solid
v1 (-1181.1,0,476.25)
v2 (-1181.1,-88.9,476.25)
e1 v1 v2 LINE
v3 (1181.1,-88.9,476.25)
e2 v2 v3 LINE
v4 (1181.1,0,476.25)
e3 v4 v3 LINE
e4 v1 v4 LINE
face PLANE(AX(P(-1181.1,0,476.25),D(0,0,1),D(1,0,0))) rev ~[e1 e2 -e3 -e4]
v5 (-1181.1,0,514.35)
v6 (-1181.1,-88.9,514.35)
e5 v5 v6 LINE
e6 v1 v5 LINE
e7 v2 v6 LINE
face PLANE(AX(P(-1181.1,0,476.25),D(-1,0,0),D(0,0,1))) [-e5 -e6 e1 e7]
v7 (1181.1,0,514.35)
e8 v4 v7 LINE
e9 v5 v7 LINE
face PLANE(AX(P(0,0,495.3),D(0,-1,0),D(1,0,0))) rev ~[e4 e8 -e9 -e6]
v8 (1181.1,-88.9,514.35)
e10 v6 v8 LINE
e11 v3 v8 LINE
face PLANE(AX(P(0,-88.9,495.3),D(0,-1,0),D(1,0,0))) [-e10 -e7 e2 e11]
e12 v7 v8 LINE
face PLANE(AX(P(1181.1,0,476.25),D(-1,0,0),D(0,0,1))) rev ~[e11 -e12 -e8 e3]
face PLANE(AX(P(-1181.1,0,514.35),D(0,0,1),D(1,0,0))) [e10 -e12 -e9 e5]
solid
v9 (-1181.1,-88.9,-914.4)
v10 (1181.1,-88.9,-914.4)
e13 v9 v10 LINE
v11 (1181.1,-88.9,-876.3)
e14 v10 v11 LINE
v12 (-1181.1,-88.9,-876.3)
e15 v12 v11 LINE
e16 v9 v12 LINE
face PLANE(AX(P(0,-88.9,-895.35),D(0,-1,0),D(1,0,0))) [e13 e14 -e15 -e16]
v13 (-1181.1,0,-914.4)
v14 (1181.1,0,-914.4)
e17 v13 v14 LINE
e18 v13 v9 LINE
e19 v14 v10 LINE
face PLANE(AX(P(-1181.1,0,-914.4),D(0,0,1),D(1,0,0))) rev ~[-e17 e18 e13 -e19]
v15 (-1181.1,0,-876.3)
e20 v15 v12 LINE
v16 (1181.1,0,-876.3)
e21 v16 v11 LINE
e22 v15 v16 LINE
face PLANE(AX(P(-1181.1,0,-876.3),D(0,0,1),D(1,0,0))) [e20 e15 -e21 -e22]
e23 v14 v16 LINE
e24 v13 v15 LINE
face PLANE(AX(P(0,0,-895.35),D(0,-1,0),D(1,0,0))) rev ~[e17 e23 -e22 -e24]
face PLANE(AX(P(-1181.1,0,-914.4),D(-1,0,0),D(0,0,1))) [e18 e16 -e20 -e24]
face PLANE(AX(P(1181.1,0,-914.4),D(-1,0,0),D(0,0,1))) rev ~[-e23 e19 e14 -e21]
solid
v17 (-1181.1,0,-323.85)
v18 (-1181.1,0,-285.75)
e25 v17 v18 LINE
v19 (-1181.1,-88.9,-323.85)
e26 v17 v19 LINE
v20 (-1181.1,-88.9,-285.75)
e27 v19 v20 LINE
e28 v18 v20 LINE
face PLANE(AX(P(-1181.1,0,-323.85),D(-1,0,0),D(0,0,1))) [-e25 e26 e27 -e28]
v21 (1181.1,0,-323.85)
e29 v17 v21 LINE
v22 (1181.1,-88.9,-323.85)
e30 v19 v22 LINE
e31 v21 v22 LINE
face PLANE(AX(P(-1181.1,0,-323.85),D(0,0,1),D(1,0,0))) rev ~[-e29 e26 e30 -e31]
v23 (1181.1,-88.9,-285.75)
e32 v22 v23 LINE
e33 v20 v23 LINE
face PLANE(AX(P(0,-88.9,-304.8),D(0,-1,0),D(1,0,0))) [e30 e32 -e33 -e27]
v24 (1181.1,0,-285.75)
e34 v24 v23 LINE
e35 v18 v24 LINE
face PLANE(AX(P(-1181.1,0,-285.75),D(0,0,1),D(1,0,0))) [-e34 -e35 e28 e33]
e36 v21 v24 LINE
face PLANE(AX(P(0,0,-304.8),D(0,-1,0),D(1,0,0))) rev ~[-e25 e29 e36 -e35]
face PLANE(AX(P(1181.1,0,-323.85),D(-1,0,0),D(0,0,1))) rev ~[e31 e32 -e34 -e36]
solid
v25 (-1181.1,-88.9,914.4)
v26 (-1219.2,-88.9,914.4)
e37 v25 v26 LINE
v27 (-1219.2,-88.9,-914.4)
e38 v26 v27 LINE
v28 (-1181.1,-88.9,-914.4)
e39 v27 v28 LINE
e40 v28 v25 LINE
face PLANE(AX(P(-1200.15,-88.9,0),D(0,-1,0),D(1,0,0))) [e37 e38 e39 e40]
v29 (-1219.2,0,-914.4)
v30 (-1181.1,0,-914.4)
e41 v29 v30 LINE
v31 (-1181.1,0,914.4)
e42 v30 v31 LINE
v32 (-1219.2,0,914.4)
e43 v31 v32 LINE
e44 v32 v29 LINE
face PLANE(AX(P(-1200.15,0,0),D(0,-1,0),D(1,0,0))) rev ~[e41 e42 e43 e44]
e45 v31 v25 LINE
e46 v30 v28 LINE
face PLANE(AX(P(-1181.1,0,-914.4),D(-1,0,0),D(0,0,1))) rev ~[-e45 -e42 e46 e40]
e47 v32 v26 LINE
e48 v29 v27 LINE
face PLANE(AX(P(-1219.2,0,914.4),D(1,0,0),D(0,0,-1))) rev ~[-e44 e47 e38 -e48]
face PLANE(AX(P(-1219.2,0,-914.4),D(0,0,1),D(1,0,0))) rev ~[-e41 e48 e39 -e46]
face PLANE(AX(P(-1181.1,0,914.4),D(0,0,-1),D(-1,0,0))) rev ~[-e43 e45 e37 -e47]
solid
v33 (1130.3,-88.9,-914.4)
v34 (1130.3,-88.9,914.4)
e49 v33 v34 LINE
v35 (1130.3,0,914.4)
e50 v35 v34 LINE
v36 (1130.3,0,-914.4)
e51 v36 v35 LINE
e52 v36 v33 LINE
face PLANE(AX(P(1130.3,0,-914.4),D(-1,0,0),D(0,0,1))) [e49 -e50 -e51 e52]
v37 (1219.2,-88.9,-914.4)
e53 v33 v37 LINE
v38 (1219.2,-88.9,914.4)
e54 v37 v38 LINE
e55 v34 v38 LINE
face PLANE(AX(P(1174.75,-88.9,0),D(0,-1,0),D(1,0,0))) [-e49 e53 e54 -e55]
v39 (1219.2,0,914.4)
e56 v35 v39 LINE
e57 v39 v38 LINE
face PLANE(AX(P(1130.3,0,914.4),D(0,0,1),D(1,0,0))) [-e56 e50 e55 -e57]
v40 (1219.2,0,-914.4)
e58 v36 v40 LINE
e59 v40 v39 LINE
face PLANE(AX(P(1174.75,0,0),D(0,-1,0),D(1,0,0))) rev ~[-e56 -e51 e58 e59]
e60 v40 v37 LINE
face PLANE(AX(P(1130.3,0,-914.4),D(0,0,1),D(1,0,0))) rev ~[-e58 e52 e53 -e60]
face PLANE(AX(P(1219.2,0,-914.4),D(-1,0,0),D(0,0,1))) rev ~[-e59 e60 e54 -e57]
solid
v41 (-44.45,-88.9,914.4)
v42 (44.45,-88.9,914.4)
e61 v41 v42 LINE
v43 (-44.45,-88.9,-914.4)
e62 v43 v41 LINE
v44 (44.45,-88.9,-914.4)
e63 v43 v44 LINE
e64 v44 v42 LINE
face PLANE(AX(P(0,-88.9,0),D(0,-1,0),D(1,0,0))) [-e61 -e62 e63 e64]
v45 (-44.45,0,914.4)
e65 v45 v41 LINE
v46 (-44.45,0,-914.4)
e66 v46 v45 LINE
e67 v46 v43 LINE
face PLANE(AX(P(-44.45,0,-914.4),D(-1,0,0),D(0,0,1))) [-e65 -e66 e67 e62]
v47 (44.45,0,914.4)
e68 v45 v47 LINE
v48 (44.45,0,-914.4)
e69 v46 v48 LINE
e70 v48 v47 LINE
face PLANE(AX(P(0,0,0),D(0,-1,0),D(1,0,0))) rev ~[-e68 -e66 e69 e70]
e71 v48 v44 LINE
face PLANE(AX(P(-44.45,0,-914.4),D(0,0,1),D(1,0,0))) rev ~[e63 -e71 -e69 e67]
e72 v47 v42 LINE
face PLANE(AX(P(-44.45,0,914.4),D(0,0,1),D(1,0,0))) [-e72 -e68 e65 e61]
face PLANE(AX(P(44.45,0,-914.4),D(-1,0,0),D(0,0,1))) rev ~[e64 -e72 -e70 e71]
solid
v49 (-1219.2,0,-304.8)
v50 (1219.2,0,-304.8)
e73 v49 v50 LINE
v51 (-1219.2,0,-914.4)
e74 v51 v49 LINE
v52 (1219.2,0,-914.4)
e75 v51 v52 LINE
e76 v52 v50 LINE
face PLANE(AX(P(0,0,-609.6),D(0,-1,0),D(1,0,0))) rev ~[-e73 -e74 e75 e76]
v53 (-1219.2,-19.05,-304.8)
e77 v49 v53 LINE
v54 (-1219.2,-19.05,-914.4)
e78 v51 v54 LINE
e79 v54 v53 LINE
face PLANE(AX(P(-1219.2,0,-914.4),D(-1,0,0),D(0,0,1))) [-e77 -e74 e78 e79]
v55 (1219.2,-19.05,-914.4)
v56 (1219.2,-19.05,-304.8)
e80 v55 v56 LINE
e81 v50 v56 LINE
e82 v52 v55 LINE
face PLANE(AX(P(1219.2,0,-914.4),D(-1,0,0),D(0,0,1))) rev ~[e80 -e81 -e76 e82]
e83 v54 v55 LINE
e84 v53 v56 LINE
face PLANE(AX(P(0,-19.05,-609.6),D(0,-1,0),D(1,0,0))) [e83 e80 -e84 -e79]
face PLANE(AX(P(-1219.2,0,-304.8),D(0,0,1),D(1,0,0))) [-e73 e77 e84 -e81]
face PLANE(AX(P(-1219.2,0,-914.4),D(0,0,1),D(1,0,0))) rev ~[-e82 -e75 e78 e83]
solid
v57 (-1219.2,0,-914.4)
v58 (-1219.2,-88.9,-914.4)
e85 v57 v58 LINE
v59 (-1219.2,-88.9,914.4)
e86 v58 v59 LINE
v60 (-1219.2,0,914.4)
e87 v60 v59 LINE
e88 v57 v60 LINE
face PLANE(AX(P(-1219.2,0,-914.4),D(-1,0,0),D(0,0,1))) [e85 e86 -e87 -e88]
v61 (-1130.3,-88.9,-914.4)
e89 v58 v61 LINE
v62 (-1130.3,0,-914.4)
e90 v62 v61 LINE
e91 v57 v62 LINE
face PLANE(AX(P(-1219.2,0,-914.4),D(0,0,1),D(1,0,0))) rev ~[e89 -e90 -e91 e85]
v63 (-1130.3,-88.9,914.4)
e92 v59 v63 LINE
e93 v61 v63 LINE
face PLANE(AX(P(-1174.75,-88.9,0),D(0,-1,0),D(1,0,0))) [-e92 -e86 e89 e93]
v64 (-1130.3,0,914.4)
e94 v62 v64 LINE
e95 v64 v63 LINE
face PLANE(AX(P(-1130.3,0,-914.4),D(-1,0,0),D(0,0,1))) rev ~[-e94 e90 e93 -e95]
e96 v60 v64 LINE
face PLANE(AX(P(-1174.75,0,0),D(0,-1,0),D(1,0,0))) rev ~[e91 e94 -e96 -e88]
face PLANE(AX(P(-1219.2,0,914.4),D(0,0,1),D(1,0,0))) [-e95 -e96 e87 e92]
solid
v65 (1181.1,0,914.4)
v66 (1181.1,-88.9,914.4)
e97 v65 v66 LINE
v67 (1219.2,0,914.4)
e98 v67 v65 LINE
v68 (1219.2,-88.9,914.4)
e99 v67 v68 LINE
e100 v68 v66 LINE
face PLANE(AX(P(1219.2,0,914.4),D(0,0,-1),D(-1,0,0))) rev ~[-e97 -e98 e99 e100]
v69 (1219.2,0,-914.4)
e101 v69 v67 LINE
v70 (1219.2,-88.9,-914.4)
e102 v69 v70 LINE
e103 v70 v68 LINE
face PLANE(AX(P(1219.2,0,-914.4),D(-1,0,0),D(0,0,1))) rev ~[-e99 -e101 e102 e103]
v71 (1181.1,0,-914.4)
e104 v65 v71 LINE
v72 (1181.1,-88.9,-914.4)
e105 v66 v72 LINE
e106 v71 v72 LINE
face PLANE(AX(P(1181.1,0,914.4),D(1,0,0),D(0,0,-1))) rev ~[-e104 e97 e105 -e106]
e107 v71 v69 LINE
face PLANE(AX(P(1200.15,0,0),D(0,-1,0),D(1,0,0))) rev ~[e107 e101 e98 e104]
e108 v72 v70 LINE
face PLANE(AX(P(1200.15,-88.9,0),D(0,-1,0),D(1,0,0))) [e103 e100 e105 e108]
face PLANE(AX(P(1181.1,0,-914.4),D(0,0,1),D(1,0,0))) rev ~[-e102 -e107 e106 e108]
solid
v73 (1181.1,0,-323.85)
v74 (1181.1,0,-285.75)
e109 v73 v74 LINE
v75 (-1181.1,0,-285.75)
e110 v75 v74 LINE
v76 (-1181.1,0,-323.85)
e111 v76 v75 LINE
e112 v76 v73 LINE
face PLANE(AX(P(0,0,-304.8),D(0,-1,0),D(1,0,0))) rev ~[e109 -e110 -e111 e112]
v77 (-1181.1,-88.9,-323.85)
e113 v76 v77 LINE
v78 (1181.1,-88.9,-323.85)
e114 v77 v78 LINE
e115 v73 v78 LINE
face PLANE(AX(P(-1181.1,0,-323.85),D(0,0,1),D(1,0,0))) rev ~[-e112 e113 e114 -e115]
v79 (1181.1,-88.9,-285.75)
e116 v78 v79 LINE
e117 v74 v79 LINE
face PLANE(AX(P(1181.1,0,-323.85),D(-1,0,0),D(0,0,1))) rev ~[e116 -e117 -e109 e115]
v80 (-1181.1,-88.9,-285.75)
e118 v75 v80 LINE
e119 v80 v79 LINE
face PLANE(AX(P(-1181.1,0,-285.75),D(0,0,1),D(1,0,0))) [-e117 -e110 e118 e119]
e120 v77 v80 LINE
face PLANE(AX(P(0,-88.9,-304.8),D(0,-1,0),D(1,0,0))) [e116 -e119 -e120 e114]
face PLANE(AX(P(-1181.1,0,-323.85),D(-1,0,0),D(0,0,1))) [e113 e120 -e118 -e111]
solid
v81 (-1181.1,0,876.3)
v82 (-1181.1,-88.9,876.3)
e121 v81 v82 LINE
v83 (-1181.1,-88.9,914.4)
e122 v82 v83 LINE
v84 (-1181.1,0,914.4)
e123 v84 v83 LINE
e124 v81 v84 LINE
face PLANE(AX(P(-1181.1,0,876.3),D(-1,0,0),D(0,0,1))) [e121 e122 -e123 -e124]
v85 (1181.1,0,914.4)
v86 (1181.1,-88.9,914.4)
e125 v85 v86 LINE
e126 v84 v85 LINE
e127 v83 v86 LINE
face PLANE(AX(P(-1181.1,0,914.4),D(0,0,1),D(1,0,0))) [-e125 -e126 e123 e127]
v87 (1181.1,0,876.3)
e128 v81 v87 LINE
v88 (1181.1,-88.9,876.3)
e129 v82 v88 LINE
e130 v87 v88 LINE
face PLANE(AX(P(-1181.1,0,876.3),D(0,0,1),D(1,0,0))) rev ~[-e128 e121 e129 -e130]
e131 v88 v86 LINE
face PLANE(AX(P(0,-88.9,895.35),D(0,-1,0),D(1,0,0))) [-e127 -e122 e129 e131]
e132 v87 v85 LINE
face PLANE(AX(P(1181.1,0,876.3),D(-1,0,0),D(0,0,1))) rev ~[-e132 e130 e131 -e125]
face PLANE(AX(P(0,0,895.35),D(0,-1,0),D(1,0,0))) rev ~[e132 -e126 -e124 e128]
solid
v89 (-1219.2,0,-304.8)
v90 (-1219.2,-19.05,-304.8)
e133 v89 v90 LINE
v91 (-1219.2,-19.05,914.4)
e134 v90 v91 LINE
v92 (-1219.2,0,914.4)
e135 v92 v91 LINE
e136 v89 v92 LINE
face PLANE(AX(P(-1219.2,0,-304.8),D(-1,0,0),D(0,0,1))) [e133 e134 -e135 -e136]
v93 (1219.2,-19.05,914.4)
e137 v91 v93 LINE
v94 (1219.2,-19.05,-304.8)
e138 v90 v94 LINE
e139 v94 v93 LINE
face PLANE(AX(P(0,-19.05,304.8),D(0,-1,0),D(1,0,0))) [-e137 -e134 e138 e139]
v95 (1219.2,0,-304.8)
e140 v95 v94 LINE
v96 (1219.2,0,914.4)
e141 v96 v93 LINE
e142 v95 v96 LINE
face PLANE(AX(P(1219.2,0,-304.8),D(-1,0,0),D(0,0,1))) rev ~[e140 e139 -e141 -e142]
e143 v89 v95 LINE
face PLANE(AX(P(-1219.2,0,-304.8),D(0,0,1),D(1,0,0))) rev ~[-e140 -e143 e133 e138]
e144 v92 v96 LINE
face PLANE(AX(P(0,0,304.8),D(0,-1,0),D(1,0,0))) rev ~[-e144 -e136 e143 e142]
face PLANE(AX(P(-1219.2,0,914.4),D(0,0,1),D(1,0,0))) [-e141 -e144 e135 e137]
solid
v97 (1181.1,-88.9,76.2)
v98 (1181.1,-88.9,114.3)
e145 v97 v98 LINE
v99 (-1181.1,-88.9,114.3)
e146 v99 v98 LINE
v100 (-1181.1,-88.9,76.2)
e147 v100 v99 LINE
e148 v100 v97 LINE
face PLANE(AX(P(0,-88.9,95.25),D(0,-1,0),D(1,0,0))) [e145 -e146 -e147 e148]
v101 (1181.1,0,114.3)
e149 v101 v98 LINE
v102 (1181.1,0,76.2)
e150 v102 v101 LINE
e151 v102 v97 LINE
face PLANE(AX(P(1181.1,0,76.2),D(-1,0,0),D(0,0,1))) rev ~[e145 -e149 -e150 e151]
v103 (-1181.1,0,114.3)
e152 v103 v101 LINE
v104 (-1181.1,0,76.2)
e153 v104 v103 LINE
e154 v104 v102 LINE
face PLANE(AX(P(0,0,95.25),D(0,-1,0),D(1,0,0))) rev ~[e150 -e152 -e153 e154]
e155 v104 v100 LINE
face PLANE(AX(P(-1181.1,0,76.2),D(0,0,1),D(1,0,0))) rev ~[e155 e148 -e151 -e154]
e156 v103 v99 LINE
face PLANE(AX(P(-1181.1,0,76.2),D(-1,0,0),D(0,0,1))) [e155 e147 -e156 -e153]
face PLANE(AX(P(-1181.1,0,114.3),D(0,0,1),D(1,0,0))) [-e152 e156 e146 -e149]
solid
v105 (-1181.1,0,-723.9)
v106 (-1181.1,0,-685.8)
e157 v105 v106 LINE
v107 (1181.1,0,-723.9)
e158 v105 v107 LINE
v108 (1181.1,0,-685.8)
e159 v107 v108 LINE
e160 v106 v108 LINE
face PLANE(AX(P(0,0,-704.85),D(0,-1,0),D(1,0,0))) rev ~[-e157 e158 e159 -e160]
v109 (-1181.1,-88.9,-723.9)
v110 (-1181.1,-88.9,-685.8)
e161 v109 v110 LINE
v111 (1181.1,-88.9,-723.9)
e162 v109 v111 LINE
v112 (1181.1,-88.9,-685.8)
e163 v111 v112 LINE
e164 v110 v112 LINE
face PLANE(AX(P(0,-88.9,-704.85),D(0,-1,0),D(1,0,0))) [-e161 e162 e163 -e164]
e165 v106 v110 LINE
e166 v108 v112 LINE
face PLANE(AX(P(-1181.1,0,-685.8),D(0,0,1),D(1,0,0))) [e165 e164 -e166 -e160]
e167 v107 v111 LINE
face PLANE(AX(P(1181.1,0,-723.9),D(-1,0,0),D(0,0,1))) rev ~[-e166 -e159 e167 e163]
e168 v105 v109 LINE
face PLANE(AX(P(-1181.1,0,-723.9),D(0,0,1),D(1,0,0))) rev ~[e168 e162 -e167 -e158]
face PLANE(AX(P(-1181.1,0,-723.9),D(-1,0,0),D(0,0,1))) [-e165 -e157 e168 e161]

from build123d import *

# Parameters (mm, degrees)
F1_W      = 88.9
F1_H      = 1828.8
F3_DEPTH  = 88.9
F2_W      = 2362.2
F2_H      = 38.1
F4_DEPTH  = 88.9
F5_DEPTH  = 88.9
F6_DEPTH  = 88.9
F8_DEPTH  = 88.9
F7_W      = 2438.4
F7_H      = 1219.2
F7_W_2    = 2362.2
F7_H_2    = 361.95
F9_DEPTH  = 19.05
F7_H_3    = 609.6
F10_DEPTH = 19.05


# Not quite as in the source:
# - a feature names something its author has since deleted; it is built from what else it names


with BuildPart() as f3:
    # F1 (on face) → F3 (new body)
    with BuildSketch(Plane.XZ):
        with Locations((-1174.75, 0)):
            Rectangle(F1_W, F1_H)
    extrude(amount=F3_DEPTH)


with BuildPart() as f3b:
    # F1 (on face) → F3, piece 2 (new body)
    with BuildSketch(Plane.XZ):
        Rectangle(F1_W, F1_H)
    extrude(amount=F3_DEPTH)


with BuildPart() as f3c:
    # F1 (on face) → F3, piece 3 (new body)
    with BuildSketch(Plane.XZ):
        with Locations((1174.75, 0)):
            Rectangle(F1_W, F1_H)
    extrude(amount=F3_DEPTH)


with BuildPart() as f4:
    # F2 (on face) → F4 (new body)
    with BuildSketch(Plane.XZ):
        with Locations((0, 895.35)):
            Rectangle(F2_W, F2_H)
    extrude(amount=F4_DEPTH)


with BuildPart() as f4b:
    # F2 (on face) → F4, piece 2 (new body)
    with BuildSketch(Plane.XZ):
        with Locations((0, -895.35)):
            Rectangle(F2_W, F2_H)
    extrude(amount=F4_DEPTH)


with BuildPart() as f5:
    # F2 (on face) → F5 (new body)
    with BuildSketch(Plane.XZ):
        Polygon((-1181.1, 876.3), (-1181.1, 914.4), (-1219.2, 914.4), (-1219.2, -914.4), (-1181.1, -914.4), (-1181.1, -876.3), (-1181.1, -723.9), (-1181.1, -685.8), (-1181.1, -323.85), (-1181.1, -285.75), (-1181.1, 76.2), (-1181.1, 114.3), (-1181.1, 476.25), (-1181.1, 514.35), align=None)
    extrude(amount=F5_DEPTH)


with BuildPart() as f5b:
    # F2 (on face) → F5, piece 2 (new body)
    with BuildSketch(Plane.XZ):
        Polygon((1219.2, 914.4), (1181.1, 914.4), (1181.1, 876.3), (1181.1, 514.35), (1181.1, 476.25), (1181.1, 114.3), (1181.1, 76.2), (1181.1, -285.75), (1181.1, -323.85), (1181.1, -685.8), (1181.1, -723.9), (1181.1, -876.3), (1181.1, -914.4), (1219.2, -914.4), align=None)
    extrude(amount=F5_DEPTH)


with BuildPart() as f6:
    # F2 (on face) → F6 (new body)
    with BuildSketch(Plane.XZ):
        with Locations((0, 495.3)):
            Rectangle(F2_W, F2_H)
    extrude(amount=F6_DEPTH)


with BuildPart() as f6b:
    # F2 (on face) → F6, piece 2 (new body)
    with BuildSketch(Plane.XZ):
        with Locations((0, 95.25)):
            Rectangle(F2_W, F2_H)
    extrude(amount=F6_DEPTH)


with BuildPart() as f6c:
    # F2 (on face) → F6, piece 3 (new body)
    with BuildSketch(Plane.XZ):
        with Locations((0, -304.8)):
            Rectangle(F2_W, F2_H)
    extrude(amount=F6_DEPTH)


with BuildPart() as f8:
    # F2 (on face) → F8 (new body)
    with BuildSketch(Plane.XZ):
        with Locations((0, -304.8)):
            Rectangle(F2_W, F2_H)
    extrude(amount=F8_DEPTH)


with BuildPart() as f8b:
    # F2 (on face) → F8, piece 2 (new body)
    with BuildSketch(Plane.XZ):
        with Locations((0, -704.85)):
            Rectangle(F2_W, F2_H)
    extrude(amount=F8_DEPTH)


with BuildPart() as f9:
    # F7 (on face) → F9 (new body)
    with BuildSketch(Plane.XZ):
        with Locations((0, 304.8)):
            Rectangle(F7_W, F7_H)
        with Locations((0, 295.275)):
            Rectangle(F7_W_2, F7_H_2, mode=Mode.SUBTRACT)
        with Locations((0, 295.275)):
            Rectangle(F7_W_2, F7_H_2)
    extrude(amount=F9_DEPTH)


with BuildPart() as f10:
    # F7 (on face) → F10 (new body)
    with BuildSketch(Plane.XZ):
        with Locations((0, -609.6)):
            Rectangle(F7_W, F7_H_3)
    extrude(amount=F10_DEPTH)


solid = Compound([f3.part, f3b.part, f3c.part, f4.part, f4b.part, f5.part, f5b.part, f6.part, f6b.part, f6c.part, f8.part, f8b.part, f9.part, f10.part])
